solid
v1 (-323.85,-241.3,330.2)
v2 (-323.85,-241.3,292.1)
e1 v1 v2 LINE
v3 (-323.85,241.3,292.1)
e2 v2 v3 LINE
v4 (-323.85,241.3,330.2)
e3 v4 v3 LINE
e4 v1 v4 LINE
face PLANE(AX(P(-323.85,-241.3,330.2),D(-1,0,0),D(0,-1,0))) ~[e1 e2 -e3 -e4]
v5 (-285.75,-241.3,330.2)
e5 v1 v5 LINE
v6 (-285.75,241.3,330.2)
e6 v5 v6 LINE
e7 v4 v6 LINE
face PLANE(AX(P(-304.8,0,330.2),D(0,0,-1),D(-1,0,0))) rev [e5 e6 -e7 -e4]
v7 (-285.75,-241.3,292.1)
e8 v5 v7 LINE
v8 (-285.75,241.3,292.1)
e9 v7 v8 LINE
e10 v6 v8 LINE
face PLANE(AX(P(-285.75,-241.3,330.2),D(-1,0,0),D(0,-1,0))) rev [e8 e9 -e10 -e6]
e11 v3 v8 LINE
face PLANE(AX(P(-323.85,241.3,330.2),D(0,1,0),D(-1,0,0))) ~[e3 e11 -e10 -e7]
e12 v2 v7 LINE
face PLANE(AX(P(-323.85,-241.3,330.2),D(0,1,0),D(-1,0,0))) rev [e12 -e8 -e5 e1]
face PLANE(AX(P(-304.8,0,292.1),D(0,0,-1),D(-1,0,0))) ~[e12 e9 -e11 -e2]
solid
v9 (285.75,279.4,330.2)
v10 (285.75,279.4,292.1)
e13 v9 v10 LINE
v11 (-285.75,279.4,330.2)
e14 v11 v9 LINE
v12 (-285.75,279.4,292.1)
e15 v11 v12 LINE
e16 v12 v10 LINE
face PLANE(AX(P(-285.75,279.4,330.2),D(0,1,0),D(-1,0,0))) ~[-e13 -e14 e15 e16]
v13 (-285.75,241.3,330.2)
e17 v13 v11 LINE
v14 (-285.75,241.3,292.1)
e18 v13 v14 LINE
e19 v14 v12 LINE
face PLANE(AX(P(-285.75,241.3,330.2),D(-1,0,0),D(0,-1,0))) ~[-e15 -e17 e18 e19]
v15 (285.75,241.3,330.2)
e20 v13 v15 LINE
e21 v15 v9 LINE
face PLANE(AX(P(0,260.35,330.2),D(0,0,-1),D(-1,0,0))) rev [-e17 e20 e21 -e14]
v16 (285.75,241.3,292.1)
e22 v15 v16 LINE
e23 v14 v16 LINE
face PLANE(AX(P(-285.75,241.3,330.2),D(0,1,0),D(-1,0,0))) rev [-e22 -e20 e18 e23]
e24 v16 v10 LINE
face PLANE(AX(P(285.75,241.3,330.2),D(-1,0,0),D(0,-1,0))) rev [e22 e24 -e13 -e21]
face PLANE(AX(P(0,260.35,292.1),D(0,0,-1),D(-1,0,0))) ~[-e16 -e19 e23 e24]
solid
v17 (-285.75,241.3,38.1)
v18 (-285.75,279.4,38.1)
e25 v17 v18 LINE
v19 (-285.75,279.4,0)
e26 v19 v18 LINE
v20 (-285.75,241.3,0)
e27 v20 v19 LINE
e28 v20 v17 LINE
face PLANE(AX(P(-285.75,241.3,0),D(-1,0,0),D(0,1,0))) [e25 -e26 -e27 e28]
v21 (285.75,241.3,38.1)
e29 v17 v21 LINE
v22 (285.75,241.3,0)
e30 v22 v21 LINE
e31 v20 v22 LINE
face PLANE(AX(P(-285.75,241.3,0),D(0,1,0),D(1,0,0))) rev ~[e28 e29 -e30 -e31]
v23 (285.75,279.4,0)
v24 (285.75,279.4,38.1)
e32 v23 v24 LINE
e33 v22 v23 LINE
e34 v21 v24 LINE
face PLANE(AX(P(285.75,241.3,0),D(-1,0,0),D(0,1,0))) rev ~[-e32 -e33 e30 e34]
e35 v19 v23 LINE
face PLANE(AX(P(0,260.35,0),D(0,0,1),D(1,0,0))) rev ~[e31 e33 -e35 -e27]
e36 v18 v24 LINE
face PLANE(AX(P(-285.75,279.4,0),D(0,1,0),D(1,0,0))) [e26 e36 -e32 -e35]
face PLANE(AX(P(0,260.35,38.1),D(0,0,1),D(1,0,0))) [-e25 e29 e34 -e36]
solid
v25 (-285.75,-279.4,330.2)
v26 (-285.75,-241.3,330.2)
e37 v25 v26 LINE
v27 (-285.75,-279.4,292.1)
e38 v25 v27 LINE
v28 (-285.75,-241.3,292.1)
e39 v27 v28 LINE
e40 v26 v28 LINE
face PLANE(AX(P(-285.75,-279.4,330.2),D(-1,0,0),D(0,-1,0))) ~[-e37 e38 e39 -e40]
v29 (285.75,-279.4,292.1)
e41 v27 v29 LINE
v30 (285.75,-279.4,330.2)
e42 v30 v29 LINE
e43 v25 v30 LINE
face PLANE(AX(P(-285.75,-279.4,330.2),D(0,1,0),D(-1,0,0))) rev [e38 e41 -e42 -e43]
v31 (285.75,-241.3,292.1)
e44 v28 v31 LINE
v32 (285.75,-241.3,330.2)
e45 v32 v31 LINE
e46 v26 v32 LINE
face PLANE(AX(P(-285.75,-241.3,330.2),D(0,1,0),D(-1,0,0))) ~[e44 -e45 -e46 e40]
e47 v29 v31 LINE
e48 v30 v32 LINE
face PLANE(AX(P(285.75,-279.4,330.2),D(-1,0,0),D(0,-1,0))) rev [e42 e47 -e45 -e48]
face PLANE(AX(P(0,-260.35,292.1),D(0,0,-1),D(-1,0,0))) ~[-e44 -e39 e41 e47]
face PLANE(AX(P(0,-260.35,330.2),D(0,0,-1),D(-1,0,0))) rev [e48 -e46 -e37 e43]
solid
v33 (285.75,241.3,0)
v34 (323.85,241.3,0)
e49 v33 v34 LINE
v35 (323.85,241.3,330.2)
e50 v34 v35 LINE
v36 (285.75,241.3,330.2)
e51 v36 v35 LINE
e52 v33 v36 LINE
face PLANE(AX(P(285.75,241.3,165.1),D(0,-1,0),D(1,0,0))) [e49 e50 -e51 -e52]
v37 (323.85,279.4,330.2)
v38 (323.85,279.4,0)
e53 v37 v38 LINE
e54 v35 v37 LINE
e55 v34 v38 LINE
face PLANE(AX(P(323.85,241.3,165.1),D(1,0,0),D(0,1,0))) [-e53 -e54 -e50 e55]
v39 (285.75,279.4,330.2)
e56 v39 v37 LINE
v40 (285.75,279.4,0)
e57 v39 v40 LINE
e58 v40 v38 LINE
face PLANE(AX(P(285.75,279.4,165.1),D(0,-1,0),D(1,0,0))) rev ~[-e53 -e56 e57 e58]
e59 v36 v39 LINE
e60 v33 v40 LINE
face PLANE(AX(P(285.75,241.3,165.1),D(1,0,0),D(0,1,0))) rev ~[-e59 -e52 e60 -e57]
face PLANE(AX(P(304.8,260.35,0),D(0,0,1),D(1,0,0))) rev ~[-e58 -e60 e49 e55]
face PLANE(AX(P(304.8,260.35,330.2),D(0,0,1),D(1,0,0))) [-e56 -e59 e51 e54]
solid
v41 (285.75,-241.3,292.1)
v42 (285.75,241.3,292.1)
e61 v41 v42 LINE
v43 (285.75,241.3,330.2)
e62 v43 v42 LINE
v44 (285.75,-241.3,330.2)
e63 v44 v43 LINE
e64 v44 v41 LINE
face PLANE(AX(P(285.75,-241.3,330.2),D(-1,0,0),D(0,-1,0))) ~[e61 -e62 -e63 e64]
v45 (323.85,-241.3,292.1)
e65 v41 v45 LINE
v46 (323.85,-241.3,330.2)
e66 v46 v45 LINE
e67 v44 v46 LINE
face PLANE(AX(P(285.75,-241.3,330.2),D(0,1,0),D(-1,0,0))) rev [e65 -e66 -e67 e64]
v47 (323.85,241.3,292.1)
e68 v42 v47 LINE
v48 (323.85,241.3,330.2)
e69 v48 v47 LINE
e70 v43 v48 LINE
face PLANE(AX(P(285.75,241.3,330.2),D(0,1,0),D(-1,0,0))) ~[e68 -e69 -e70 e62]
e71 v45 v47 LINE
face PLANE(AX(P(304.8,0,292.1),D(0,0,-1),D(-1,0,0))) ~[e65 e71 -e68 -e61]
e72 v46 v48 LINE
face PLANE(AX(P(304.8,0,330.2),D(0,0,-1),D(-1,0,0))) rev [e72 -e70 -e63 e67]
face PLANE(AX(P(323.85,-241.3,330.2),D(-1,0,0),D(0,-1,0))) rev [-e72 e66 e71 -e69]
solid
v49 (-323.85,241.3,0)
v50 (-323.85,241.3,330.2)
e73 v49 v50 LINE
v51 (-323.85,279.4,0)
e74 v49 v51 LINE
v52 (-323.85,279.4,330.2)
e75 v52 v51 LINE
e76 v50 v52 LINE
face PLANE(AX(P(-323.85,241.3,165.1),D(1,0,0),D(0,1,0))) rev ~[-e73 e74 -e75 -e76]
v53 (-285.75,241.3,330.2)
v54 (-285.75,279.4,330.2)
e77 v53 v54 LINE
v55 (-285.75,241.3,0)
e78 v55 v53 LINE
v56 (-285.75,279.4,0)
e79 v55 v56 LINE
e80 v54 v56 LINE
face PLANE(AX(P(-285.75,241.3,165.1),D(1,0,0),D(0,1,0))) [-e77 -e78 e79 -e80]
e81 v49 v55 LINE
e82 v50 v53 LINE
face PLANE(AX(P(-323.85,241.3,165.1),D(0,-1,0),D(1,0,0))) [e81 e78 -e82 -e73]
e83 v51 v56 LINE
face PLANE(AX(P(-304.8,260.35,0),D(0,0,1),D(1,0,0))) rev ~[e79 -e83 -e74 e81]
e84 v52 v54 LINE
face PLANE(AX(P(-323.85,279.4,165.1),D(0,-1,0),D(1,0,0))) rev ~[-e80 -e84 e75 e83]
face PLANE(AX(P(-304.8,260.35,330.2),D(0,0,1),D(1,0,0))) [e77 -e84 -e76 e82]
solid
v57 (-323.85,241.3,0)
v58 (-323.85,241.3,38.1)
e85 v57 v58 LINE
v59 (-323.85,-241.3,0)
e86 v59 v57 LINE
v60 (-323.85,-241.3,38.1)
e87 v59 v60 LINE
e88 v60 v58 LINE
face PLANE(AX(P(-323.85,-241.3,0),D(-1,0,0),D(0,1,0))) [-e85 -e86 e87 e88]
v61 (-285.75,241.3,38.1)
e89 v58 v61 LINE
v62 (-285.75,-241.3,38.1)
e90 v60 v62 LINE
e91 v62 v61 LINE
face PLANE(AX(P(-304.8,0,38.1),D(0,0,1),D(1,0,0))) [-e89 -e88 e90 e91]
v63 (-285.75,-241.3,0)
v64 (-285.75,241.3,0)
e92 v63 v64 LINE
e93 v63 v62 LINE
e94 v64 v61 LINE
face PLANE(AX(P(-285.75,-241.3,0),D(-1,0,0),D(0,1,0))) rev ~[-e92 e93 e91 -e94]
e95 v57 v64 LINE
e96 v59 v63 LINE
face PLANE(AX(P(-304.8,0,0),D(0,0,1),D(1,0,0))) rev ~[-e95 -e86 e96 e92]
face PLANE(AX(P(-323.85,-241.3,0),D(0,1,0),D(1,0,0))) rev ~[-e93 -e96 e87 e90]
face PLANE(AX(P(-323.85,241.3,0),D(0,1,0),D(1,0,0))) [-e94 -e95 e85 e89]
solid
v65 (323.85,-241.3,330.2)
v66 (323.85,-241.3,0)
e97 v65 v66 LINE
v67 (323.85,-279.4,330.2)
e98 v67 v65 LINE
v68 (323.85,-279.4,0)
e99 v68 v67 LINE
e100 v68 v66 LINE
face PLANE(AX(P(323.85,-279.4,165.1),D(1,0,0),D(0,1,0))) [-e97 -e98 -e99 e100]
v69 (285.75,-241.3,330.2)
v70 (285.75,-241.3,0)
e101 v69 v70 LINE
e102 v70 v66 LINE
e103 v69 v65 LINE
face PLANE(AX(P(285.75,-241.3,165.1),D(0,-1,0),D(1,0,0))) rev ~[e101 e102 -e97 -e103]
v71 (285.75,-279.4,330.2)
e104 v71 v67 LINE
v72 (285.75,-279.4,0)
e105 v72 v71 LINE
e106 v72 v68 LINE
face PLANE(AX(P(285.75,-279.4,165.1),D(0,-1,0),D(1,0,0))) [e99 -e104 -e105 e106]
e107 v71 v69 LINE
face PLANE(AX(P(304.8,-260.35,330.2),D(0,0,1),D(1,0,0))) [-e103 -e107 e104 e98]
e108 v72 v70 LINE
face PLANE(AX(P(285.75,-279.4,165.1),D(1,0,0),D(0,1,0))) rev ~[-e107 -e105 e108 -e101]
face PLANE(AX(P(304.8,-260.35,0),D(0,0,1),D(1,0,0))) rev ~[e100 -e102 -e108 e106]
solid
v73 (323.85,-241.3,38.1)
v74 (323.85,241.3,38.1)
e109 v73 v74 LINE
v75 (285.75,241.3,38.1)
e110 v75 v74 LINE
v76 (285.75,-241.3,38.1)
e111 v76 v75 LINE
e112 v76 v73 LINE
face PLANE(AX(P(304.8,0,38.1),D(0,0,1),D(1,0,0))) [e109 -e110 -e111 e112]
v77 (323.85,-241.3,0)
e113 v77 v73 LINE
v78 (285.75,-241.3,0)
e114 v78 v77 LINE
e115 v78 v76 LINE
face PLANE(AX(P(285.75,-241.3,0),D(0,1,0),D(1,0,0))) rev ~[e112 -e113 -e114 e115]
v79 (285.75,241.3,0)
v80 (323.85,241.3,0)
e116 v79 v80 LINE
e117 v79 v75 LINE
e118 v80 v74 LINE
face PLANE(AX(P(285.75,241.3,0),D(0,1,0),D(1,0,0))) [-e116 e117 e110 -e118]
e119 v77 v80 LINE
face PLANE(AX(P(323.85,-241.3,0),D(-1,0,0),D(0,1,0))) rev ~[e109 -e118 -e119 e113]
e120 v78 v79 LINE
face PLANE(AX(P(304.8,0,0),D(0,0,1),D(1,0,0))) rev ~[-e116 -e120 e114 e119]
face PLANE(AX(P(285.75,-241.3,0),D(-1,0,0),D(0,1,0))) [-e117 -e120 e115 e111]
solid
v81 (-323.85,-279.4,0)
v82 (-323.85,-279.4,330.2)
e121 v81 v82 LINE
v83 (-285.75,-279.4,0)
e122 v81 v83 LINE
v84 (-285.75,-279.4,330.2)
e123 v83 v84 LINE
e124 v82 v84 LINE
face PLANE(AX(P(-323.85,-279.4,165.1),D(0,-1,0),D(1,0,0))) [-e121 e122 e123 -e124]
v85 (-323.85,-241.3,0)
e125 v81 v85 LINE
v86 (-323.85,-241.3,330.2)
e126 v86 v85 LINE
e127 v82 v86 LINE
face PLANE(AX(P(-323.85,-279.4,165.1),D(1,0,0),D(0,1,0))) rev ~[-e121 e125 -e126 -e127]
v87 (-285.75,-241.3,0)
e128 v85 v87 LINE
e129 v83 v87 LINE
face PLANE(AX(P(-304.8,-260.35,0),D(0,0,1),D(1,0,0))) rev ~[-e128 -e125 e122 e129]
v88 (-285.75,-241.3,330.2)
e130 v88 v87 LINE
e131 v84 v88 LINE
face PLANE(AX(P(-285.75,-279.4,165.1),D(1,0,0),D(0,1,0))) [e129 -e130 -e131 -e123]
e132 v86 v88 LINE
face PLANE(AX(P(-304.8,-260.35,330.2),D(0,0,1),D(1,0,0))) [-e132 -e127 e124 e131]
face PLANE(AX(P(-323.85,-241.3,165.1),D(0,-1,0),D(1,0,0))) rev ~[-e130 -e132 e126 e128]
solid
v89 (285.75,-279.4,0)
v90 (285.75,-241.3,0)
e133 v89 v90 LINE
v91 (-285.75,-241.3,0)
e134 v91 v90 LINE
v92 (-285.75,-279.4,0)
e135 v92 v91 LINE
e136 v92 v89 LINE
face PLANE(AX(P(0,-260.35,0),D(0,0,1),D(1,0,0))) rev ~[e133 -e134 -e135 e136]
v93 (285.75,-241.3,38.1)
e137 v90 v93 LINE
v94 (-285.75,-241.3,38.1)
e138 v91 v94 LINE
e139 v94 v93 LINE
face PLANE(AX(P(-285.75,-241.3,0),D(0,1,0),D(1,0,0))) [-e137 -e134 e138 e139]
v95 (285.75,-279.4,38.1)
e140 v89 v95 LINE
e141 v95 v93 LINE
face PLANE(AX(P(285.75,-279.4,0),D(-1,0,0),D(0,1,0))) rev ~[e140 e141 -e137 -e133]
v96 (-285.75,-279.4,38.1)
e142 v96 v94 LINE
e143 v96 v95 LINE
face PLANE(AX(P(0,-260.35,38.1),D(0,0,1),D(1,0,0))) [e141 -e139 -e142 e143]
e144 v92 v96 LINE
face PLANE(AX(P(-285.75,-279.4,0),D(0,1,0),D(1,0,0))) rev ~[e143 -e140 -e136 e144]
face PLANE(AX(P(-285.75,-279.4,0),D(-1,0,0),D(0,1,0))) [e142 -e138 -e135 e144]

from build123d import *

# Parameters (mm, degrees)
F0_W     = 571.5
F0_H     = 38.1
F1_DEPTH = 38.1
F0_W_2   = 38.1
F0_H_2   = 482.6
F3_W     = 38.1
F3_H     = 38.1
F4_DEPTH = 165.1


# Not quite as in the source:
# - a pattern or mirror of a feature is missing from the dataset's text; its kind, count and spacing are read off the source's solid


with BuildPart() as f1:
    # F0 (on Top) → F1 (new body)
    with BuildSketch(Plane.XY):
        with Locations((0, 260.35)):
            Rectangle(F0_W, F0_H)
    extrude(amount=F1_DEPTH)


with BuildPart() as f1b:
    # F0 (on Top) → F1, piece 2 (new body)
    with BuildSketch(Plane.XY):
        with Locations((-304.8, 0)):
            Rectangle(F0_W_2, F0_H_2)
    extrude(amount=F1_DEPTH)


with BuildPart() as f1c:
    # F0 (on Top) → F1, piece 3 (new body)
    with BuildSketch(Plane.XY):
        with Locations((304.8, 0)):
            Rectangle(F0_W_2, F0_H_2)
    extrude(amount=F1_DEPTH)


with BuildPart() as f1d:
    # F0 (on Top) → F1, piece 4 (new body)
    with BuildSketch(Plane.XY):
        with Locations((0, -260.35)):
            Rectangle(F0_W, F0_H)
    extrude(amount=F1_DEPTH)


with BuildPart() as f1_copies_1:
    # F1_copies: instance of F1
    add(f1.part.mirror(Plane.XY.offset(165.1)))


with BuildPart() as f1_2_copies_1:
    # F1_2_copies: instance of F1b
    add(f1b.part.mirror(Plane.XY.offset(165.1)))


with BuildPart() as f1_3_copies_1:
    # F1_3_copies: instance of F1c
    add(f1c.part.mirror(Plane.XY.offset(165.1)))


with BuildPart() as f1_4_copies_1:
    # F1_4_copies: instance of F1d
    add(f1d.part.mirror(Plane.XY.offset(165.1)))


with BuildPart() as f4:
    # F3 (on offset) → F4 (new body, symmetric)
    with BuildSketch(Plane.XY.offset(165.1)):
        with Locations((-304.8, -260.35)):
            Rectangle(F3_W, F3_H)
    extrude(amount=F4_DEPTH, both=True)


with BuildPart() as f4b:
    # F3 (on offset) → F4, piece 2 (new body, symmetric)
    with BuildSketch(Plane.XY.offset(165.1)):
        with Locations((304.8, -260.35)):
            Rectangle(F3_W, F3_H)
    extrude(amount=F4_DEPTH, both=True)


with BuildPart() as f4c:
    # F3 (on offset) → F4, piece 3 (new body, symmetric)
    with BuildSketch(Plane.XY.offset(165.1)):
        with Locations((304.8, 260.35)):
            Rectangle(F3_W, F3_H)
    extrude(amount=F4_DEPTH, both=True)


with BuildPart() as f4d:
    # F3 (on offset) → F4, piece 4 (new body, symmetric)
    with BuildSketch(Plane.XY.offset(165.1)):
        with Locations((-304.8, 260.35)):
            Rectangle(F3_W, F3_H)
    extrude(amount=F4_DEPTH, both=True)


solid = Compound([f1.part, f1b.part, f1c.part, f1d.part, f1_copies_1.part, f1_2_copies_1.part, f1_3_copies_1.part, f1_4_copies_1.part, f4.part, f4b.part, f4c.part, f4d.part])
